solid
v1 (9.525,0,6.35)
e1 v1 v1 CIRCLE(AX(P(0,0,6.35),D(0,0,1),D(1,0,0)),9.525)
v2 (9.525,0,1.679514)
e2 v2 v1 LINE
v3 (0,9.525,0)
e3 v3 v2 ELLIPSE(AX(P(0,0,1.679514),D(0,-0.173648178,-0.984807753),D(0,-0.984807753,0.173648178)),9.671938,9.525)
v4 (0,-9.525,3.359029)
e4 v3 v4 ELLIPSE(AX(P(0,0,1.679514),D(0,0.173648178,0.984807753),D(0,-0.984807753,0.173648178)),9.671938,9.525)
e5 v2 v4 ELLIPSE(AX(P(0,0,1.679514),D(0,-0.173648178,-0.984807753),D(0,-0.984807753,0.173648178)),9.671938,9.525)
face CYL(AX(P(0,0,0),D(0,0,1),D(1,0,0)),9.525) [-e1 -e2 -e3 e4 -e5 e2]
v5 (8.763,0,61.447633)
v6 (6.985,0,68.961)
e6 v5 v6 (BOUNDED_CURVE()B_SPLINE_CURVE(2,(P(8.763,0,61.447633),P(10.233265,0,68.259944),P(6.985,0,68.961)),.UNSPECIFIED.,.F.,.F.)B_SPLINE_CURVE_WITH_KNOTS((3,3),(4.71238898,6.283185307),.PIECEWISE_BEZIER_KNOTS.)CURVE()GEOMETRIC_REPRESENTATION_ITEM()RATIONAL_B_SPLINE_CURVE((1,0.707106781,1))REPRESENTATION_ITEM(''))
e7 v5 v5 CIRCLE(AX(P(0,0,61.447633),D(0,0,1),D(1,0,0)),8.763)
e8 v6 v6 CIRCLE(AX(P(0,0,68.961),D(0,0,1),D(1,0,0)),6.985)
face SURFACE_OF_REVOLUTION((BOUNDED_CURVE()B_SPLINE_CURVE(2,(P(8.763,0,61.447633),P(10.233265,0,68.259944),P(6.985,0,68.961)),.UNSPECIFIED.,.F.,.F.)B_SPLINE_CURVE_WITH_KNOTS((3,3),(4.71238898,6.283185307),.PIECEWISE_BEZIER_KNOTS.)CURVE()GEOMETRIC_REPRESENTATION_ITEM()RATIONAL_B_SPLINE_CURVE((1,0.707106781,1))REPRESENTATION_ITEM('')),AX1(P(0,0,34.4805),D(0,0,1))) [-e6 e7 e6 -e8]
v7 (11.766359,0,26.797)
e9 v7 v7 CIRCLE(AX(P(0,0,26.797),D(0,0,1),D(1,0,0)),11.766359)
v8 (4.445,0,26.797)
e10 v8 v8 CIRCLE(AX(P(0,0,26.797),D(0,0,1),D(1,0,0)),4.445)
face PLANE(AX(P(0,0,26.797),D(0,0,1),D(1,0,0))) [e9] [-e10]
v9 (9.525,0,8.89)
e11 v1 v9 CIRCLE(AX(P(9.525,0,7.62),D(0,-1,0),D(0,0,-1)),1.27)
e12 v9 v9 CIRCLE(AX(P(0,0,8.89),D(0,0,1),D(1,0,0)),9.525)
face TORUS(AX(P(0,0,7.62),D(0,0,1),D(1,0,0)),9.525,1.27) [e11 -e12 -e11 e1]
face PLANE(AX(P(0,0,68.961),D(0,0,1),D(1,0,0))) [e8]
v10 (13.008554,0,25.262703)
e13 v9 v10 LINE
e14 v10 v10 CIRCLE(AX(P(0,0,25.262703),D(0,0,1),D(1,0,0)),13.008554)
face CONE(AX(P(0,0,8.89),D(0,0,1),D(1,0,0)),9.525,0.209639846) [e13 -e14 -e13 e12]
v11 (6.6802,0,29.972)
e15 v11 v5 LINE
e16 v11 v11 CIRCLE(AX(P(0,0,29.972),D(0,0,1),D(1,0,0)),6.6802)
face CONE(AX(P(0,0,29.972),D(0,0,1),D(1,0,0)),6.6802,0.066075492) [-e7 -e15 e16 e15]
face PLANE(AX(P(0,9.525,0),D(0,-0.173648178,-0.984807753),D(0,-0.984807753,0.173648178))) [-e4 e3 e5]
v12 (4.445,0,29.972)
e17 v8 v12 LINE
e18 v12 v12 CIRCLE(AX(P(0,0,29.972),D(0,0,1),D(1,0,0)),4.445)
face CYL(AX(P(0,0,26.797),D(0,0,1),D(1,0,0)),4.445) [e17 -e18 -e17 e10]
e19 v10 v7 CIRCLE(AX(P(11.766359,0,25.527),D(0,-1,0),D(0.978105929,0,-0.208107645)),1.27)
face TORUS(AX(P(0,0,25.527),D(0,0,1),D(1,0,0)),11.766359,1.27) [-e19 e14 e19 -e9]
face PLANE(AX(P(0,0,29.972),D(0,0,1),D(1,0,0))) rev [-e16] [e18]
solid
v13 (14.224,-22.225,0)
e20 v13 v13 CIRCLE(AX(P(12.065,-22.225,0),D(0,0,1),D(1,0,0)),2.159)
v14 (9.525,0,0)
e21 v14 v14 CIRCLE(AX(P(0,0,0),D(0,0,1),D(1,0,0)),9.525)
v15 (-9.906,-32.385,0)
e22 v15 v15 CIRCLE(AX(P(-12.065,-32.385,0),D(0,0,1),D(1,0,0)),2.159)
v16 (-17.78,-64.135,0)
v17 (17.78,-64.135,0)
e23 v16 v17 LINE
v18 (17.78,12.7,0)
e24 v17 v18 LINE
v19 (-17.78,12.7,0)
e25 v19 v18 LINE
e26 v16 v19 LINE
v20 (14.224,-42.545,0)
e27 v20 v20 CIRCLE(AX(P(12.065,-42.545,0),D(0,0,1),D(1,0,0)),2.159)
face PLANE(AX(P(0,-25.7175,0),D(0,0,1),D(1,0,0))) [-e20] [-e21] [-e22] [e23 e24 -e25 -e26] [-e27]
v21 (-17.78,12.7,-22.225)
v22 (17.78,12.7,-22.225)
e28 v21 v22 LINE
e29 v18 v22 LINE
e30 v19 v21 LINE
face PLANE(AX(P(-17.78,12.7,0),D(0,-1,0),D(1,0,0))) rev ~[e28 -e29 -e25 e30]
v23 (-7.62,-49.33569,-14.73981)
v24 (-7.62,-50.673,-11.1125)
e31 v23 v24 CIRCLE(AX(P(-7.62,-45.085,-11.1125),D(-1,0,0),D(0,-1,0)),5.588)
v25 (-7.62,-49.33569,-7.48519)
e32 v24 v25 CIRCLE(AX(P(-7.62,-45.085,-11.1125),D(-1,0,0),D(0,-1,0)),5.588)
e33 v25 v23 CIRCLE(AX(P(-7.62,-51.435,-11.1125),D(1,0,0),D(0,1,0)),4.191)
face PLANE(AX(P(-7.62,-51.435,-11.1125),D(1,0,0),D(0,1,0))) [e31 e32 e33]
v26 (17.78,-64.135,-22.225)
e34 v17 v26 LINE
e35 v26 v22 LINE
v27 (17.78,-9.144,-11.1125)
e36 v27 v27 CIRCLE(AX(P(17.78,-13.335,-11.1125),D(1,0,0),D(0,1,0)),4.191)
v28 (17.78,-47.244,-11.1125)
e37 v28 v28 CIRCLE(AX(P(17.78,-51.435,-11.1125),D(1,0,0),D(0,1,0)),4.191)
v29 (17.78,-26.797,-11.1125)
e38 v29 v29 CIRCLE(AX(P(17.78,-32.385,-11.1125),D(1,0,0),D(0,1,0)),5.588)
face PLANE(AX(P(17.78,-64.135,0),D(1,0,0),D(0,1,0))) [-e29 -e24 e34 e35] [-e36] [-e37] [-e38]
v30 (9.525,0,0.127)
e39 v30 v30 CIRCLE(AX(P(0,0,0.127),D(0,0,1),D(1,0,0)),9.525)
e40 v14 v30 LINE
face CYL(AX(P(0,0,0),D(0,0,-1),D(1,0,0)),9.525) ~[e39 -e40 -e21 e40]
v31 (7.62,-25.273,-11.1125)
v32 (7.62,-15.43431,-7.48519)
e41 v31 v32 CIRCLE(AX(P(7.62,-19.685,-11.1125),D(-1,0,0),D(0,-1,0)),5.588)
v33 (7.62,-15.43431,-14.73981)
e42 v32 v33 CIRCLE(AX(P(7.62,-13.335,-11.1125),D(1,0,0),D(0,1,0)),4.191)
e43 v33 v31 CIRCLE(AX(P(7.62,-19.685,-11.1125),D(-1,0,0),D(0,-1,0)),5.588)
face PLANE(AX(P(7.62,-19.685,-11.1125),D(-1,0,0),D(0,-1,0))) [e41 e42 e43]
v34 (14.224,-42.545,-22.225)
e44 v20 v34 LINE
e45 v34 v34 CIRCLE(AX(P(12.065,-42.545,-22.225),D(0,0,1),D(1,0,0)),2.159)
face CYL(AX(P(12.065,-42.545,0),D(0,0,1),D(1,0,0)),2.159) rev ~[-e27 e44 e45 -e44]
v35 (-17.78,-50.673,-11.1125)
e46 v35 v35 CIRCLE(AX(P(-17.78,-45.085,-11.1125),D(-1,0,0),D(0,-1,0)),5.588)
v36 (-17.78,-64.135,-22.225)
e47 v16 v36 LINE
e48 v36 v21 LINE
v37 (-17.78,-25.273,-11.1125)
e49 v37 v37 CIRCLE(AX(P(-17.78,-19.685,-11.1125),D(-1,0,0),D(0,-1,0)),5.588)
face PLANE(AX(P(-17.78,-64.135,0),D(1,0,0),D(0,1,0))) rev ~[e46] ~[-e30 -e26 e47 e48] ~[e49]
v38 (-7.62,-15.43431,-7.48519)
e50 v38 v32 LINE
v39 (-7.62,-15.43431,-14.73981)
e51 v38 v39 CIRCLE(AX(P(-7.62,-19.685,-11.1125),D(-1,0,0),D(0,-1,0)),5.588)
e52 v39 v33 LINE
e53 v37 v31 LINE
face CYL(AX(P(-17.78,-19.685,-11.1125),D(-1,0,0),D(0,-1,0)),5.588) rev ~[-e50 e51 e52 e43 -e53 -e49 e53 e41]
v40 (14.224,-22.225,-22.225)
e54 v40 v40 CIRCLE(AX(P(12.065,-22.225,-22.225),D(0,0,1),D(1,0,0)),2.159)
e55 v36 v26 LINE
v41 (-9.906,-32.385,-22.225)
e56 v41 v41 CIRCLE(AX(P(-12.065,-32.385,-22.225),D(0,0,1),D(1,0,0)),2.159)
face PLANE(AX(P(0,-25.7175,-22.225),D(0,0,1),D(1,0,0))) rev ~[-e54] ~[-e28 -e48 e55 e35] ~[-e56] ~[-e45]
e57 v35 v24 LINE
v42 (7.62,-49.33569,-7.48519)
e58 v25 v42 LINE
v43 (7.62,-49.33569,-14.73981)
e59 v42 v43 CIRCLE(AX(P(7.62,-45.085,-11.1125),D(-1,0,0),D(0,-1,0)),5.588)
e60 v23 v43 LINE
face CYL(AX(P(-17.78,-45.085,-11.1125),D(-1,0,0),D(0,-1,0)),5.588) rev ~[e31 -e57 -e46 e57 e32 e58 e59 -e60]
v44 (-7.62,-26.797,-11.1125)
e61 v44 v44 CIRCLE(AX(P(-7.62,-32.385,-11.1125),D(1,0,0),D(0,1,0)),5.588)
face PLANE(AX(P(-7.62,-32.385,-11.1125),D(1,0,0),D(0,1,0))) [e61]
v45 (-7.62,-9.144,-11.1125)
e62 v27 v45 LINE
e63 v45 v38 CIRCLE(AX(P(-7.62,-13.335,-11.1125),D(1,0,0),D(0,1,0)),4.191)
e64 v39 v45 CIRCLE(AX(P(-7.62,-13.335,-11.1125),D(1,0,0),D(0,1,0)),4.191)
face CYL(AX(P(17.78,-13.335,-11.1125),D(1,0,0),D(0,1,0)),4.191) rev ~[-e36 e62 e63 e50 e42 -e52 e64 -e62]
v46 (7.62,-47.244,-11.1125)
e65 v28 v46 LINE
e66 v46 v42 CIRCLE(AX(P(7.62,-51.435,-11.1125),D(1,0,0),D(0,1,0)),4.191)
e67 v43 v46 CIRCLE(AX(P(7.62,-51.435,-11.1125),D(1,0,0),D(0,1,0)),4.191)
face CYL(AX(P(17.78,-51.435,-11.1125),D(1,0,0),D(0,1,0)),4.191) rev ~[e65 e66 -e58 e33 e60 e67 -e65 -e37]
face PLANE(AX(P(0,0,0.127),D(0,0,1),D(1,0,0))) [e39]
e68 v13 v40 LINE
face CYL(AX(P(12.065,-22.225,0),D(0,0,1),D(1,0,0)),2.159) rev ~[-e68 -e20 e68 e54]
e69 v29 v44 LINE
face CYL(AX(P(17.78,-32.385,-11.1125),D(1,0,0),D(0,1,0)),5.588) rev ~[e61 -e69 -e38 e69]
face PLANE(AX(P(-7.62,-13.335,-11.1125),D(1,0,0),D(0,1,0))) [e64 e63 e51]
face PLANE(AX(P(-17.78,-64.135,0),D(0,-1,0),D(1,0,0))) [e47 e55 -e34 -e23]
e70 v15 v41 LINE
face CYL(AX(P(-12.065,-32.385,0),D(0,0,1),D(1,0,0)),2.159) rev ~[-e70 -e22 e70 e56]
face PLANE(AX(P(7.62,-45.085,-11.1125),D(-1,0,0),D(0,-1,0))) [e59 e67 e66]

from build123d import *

# Parameters (mm, degrees)
F2_W          = 35.56
F2_H          = 76.835
F3_DEPTH      = 22.225
F4_R          = 4.191
F4_R_2        = 5.588
F6_DEPTH      = 25.4
F5_R          = 5.588
F7_DEPTH      = 25.4
F9_DEPTH      = 17.781
F9_DEPTH_BACK = 17.781
F10_R         = 9.525
F11_DEPTH     = 0.127
F12_R         = 2.159
F13_DEPTH     = 22.226


with BuildPart() as f1:
    # F0 (on Front) → F1 (revolve)
    with BuildSketch(Plane.XZ):
        with BuildLine():
            Line((0, 68.961), (0, 0))
            Line((0, 0), (9.525, 0))
            Line((9.525, 0), (9.525, 6.35))
            ThreePointArc((9.525, 6.35), (10.795, 7.62), (9.525, 8.89))
            Line((9.525, 8.89), (13.0085538918, 25.2627032915))
            ThreePointArc((13.0085538918, 25.2627032915), (12.7534147859, 26.3261380295), (11.766359362, 26.797))
            Line((11.766359362, 26.797), (4.445, 26.797))
            Line((4.445, 26.797), (4.445, 29.972))
            Line((4.445, 29.972), (6.6802, 29.972))
            Line((6.6802, 29.972), (8.763, 61.4476334416))
            add(Edge.make_bspline(
                [(8.763, 61.4476334416), (10.233264787, 68.2599443036), (6.985, 68.961)],
                knots=[4.7123889804, 4.7123889804, 4.7123889804, 6.2831853072, 6.2831853072, 6.2831853072], degree=2, weights=[1, 0.7071067812, 1]))
            Line((6.985, 68.961), (0, 68.961))
        make_face()
    revolve(axis=Axis((0, 0, 34.4805), (0, 0, 1)))

    # F8 (on Right) → F9 (cut, two sides)
    with BuildSketch(Plane.YZ) as f9_sk:
        Polygon((-9.525, 0), (9.525, 0), (-9.525, 3.3590289825), align=None)
    extrude(amount=-F9_DEPTH, mode=Mode.SUBTRACT)
    extrude(f9_sk.sketch, amount=F9_DEPTH_BACK, mode=Mode.SUBTRACT)


with BuildPart() as f3:
    # F2 (on Top) → F3 (new body)
    with BuildSketch(Plane.XY):
        with Locations((0, -25.7175)):
            Rectangle(F2_W, F2_H)
    extrude(amount=-F3_DEPTH)

    # F4 (on face) → F6 (cut)
    with BuildSketch(Plane.YZ.offset(17.78)):
        with Locations((-51.435, -11.1125)):
            Circle(F4_R)
        with Locations((-32.385, -11.1125)):
            Circle(F4_R_2)
        with Locations((-13.335, -11.1125)):
            Circle(F4_R)
    extrude(amount=-F6_DEPTH, mode=Mode.SUBTRACT)

    # F5 (on face) → F7 (cut)
    with BuildSketch(Plane(origin=(-17.78, 0, 0), x_dir=(0, -1, 0), z_dir=(-1, 0, 0))):
        with Locations((45.085, -11.1125)):
            Circle(F5_R)
        with Locations((19.685, -11.1125)):
            Circle(F5_R)
    extrude(amount=-F7_DEPTH, mode=Mode.SUBTRACT)

    # F10 (on face) → F11 (join)
    with BuildSketch(Plane.XY):
        Circle(F10_R)
    extrude(amount=F11_DEPTH)

    # F12 (on face) → F13 (cut, through all)
    with BuildSketch(Plane.XY):
        with Locations((-12.065, -32.385)):
            Circle(F12_R)
        with Locations((12.065, -22.225)):
            Circle(F12_R)
        with Locations((12.065, -42.545)):
            Circle(F12_R)
    extrude(amount=-F13_DEPTH, mode=Mode.SUBTRACT)


solid = Compound([f1.part, f3.part])
